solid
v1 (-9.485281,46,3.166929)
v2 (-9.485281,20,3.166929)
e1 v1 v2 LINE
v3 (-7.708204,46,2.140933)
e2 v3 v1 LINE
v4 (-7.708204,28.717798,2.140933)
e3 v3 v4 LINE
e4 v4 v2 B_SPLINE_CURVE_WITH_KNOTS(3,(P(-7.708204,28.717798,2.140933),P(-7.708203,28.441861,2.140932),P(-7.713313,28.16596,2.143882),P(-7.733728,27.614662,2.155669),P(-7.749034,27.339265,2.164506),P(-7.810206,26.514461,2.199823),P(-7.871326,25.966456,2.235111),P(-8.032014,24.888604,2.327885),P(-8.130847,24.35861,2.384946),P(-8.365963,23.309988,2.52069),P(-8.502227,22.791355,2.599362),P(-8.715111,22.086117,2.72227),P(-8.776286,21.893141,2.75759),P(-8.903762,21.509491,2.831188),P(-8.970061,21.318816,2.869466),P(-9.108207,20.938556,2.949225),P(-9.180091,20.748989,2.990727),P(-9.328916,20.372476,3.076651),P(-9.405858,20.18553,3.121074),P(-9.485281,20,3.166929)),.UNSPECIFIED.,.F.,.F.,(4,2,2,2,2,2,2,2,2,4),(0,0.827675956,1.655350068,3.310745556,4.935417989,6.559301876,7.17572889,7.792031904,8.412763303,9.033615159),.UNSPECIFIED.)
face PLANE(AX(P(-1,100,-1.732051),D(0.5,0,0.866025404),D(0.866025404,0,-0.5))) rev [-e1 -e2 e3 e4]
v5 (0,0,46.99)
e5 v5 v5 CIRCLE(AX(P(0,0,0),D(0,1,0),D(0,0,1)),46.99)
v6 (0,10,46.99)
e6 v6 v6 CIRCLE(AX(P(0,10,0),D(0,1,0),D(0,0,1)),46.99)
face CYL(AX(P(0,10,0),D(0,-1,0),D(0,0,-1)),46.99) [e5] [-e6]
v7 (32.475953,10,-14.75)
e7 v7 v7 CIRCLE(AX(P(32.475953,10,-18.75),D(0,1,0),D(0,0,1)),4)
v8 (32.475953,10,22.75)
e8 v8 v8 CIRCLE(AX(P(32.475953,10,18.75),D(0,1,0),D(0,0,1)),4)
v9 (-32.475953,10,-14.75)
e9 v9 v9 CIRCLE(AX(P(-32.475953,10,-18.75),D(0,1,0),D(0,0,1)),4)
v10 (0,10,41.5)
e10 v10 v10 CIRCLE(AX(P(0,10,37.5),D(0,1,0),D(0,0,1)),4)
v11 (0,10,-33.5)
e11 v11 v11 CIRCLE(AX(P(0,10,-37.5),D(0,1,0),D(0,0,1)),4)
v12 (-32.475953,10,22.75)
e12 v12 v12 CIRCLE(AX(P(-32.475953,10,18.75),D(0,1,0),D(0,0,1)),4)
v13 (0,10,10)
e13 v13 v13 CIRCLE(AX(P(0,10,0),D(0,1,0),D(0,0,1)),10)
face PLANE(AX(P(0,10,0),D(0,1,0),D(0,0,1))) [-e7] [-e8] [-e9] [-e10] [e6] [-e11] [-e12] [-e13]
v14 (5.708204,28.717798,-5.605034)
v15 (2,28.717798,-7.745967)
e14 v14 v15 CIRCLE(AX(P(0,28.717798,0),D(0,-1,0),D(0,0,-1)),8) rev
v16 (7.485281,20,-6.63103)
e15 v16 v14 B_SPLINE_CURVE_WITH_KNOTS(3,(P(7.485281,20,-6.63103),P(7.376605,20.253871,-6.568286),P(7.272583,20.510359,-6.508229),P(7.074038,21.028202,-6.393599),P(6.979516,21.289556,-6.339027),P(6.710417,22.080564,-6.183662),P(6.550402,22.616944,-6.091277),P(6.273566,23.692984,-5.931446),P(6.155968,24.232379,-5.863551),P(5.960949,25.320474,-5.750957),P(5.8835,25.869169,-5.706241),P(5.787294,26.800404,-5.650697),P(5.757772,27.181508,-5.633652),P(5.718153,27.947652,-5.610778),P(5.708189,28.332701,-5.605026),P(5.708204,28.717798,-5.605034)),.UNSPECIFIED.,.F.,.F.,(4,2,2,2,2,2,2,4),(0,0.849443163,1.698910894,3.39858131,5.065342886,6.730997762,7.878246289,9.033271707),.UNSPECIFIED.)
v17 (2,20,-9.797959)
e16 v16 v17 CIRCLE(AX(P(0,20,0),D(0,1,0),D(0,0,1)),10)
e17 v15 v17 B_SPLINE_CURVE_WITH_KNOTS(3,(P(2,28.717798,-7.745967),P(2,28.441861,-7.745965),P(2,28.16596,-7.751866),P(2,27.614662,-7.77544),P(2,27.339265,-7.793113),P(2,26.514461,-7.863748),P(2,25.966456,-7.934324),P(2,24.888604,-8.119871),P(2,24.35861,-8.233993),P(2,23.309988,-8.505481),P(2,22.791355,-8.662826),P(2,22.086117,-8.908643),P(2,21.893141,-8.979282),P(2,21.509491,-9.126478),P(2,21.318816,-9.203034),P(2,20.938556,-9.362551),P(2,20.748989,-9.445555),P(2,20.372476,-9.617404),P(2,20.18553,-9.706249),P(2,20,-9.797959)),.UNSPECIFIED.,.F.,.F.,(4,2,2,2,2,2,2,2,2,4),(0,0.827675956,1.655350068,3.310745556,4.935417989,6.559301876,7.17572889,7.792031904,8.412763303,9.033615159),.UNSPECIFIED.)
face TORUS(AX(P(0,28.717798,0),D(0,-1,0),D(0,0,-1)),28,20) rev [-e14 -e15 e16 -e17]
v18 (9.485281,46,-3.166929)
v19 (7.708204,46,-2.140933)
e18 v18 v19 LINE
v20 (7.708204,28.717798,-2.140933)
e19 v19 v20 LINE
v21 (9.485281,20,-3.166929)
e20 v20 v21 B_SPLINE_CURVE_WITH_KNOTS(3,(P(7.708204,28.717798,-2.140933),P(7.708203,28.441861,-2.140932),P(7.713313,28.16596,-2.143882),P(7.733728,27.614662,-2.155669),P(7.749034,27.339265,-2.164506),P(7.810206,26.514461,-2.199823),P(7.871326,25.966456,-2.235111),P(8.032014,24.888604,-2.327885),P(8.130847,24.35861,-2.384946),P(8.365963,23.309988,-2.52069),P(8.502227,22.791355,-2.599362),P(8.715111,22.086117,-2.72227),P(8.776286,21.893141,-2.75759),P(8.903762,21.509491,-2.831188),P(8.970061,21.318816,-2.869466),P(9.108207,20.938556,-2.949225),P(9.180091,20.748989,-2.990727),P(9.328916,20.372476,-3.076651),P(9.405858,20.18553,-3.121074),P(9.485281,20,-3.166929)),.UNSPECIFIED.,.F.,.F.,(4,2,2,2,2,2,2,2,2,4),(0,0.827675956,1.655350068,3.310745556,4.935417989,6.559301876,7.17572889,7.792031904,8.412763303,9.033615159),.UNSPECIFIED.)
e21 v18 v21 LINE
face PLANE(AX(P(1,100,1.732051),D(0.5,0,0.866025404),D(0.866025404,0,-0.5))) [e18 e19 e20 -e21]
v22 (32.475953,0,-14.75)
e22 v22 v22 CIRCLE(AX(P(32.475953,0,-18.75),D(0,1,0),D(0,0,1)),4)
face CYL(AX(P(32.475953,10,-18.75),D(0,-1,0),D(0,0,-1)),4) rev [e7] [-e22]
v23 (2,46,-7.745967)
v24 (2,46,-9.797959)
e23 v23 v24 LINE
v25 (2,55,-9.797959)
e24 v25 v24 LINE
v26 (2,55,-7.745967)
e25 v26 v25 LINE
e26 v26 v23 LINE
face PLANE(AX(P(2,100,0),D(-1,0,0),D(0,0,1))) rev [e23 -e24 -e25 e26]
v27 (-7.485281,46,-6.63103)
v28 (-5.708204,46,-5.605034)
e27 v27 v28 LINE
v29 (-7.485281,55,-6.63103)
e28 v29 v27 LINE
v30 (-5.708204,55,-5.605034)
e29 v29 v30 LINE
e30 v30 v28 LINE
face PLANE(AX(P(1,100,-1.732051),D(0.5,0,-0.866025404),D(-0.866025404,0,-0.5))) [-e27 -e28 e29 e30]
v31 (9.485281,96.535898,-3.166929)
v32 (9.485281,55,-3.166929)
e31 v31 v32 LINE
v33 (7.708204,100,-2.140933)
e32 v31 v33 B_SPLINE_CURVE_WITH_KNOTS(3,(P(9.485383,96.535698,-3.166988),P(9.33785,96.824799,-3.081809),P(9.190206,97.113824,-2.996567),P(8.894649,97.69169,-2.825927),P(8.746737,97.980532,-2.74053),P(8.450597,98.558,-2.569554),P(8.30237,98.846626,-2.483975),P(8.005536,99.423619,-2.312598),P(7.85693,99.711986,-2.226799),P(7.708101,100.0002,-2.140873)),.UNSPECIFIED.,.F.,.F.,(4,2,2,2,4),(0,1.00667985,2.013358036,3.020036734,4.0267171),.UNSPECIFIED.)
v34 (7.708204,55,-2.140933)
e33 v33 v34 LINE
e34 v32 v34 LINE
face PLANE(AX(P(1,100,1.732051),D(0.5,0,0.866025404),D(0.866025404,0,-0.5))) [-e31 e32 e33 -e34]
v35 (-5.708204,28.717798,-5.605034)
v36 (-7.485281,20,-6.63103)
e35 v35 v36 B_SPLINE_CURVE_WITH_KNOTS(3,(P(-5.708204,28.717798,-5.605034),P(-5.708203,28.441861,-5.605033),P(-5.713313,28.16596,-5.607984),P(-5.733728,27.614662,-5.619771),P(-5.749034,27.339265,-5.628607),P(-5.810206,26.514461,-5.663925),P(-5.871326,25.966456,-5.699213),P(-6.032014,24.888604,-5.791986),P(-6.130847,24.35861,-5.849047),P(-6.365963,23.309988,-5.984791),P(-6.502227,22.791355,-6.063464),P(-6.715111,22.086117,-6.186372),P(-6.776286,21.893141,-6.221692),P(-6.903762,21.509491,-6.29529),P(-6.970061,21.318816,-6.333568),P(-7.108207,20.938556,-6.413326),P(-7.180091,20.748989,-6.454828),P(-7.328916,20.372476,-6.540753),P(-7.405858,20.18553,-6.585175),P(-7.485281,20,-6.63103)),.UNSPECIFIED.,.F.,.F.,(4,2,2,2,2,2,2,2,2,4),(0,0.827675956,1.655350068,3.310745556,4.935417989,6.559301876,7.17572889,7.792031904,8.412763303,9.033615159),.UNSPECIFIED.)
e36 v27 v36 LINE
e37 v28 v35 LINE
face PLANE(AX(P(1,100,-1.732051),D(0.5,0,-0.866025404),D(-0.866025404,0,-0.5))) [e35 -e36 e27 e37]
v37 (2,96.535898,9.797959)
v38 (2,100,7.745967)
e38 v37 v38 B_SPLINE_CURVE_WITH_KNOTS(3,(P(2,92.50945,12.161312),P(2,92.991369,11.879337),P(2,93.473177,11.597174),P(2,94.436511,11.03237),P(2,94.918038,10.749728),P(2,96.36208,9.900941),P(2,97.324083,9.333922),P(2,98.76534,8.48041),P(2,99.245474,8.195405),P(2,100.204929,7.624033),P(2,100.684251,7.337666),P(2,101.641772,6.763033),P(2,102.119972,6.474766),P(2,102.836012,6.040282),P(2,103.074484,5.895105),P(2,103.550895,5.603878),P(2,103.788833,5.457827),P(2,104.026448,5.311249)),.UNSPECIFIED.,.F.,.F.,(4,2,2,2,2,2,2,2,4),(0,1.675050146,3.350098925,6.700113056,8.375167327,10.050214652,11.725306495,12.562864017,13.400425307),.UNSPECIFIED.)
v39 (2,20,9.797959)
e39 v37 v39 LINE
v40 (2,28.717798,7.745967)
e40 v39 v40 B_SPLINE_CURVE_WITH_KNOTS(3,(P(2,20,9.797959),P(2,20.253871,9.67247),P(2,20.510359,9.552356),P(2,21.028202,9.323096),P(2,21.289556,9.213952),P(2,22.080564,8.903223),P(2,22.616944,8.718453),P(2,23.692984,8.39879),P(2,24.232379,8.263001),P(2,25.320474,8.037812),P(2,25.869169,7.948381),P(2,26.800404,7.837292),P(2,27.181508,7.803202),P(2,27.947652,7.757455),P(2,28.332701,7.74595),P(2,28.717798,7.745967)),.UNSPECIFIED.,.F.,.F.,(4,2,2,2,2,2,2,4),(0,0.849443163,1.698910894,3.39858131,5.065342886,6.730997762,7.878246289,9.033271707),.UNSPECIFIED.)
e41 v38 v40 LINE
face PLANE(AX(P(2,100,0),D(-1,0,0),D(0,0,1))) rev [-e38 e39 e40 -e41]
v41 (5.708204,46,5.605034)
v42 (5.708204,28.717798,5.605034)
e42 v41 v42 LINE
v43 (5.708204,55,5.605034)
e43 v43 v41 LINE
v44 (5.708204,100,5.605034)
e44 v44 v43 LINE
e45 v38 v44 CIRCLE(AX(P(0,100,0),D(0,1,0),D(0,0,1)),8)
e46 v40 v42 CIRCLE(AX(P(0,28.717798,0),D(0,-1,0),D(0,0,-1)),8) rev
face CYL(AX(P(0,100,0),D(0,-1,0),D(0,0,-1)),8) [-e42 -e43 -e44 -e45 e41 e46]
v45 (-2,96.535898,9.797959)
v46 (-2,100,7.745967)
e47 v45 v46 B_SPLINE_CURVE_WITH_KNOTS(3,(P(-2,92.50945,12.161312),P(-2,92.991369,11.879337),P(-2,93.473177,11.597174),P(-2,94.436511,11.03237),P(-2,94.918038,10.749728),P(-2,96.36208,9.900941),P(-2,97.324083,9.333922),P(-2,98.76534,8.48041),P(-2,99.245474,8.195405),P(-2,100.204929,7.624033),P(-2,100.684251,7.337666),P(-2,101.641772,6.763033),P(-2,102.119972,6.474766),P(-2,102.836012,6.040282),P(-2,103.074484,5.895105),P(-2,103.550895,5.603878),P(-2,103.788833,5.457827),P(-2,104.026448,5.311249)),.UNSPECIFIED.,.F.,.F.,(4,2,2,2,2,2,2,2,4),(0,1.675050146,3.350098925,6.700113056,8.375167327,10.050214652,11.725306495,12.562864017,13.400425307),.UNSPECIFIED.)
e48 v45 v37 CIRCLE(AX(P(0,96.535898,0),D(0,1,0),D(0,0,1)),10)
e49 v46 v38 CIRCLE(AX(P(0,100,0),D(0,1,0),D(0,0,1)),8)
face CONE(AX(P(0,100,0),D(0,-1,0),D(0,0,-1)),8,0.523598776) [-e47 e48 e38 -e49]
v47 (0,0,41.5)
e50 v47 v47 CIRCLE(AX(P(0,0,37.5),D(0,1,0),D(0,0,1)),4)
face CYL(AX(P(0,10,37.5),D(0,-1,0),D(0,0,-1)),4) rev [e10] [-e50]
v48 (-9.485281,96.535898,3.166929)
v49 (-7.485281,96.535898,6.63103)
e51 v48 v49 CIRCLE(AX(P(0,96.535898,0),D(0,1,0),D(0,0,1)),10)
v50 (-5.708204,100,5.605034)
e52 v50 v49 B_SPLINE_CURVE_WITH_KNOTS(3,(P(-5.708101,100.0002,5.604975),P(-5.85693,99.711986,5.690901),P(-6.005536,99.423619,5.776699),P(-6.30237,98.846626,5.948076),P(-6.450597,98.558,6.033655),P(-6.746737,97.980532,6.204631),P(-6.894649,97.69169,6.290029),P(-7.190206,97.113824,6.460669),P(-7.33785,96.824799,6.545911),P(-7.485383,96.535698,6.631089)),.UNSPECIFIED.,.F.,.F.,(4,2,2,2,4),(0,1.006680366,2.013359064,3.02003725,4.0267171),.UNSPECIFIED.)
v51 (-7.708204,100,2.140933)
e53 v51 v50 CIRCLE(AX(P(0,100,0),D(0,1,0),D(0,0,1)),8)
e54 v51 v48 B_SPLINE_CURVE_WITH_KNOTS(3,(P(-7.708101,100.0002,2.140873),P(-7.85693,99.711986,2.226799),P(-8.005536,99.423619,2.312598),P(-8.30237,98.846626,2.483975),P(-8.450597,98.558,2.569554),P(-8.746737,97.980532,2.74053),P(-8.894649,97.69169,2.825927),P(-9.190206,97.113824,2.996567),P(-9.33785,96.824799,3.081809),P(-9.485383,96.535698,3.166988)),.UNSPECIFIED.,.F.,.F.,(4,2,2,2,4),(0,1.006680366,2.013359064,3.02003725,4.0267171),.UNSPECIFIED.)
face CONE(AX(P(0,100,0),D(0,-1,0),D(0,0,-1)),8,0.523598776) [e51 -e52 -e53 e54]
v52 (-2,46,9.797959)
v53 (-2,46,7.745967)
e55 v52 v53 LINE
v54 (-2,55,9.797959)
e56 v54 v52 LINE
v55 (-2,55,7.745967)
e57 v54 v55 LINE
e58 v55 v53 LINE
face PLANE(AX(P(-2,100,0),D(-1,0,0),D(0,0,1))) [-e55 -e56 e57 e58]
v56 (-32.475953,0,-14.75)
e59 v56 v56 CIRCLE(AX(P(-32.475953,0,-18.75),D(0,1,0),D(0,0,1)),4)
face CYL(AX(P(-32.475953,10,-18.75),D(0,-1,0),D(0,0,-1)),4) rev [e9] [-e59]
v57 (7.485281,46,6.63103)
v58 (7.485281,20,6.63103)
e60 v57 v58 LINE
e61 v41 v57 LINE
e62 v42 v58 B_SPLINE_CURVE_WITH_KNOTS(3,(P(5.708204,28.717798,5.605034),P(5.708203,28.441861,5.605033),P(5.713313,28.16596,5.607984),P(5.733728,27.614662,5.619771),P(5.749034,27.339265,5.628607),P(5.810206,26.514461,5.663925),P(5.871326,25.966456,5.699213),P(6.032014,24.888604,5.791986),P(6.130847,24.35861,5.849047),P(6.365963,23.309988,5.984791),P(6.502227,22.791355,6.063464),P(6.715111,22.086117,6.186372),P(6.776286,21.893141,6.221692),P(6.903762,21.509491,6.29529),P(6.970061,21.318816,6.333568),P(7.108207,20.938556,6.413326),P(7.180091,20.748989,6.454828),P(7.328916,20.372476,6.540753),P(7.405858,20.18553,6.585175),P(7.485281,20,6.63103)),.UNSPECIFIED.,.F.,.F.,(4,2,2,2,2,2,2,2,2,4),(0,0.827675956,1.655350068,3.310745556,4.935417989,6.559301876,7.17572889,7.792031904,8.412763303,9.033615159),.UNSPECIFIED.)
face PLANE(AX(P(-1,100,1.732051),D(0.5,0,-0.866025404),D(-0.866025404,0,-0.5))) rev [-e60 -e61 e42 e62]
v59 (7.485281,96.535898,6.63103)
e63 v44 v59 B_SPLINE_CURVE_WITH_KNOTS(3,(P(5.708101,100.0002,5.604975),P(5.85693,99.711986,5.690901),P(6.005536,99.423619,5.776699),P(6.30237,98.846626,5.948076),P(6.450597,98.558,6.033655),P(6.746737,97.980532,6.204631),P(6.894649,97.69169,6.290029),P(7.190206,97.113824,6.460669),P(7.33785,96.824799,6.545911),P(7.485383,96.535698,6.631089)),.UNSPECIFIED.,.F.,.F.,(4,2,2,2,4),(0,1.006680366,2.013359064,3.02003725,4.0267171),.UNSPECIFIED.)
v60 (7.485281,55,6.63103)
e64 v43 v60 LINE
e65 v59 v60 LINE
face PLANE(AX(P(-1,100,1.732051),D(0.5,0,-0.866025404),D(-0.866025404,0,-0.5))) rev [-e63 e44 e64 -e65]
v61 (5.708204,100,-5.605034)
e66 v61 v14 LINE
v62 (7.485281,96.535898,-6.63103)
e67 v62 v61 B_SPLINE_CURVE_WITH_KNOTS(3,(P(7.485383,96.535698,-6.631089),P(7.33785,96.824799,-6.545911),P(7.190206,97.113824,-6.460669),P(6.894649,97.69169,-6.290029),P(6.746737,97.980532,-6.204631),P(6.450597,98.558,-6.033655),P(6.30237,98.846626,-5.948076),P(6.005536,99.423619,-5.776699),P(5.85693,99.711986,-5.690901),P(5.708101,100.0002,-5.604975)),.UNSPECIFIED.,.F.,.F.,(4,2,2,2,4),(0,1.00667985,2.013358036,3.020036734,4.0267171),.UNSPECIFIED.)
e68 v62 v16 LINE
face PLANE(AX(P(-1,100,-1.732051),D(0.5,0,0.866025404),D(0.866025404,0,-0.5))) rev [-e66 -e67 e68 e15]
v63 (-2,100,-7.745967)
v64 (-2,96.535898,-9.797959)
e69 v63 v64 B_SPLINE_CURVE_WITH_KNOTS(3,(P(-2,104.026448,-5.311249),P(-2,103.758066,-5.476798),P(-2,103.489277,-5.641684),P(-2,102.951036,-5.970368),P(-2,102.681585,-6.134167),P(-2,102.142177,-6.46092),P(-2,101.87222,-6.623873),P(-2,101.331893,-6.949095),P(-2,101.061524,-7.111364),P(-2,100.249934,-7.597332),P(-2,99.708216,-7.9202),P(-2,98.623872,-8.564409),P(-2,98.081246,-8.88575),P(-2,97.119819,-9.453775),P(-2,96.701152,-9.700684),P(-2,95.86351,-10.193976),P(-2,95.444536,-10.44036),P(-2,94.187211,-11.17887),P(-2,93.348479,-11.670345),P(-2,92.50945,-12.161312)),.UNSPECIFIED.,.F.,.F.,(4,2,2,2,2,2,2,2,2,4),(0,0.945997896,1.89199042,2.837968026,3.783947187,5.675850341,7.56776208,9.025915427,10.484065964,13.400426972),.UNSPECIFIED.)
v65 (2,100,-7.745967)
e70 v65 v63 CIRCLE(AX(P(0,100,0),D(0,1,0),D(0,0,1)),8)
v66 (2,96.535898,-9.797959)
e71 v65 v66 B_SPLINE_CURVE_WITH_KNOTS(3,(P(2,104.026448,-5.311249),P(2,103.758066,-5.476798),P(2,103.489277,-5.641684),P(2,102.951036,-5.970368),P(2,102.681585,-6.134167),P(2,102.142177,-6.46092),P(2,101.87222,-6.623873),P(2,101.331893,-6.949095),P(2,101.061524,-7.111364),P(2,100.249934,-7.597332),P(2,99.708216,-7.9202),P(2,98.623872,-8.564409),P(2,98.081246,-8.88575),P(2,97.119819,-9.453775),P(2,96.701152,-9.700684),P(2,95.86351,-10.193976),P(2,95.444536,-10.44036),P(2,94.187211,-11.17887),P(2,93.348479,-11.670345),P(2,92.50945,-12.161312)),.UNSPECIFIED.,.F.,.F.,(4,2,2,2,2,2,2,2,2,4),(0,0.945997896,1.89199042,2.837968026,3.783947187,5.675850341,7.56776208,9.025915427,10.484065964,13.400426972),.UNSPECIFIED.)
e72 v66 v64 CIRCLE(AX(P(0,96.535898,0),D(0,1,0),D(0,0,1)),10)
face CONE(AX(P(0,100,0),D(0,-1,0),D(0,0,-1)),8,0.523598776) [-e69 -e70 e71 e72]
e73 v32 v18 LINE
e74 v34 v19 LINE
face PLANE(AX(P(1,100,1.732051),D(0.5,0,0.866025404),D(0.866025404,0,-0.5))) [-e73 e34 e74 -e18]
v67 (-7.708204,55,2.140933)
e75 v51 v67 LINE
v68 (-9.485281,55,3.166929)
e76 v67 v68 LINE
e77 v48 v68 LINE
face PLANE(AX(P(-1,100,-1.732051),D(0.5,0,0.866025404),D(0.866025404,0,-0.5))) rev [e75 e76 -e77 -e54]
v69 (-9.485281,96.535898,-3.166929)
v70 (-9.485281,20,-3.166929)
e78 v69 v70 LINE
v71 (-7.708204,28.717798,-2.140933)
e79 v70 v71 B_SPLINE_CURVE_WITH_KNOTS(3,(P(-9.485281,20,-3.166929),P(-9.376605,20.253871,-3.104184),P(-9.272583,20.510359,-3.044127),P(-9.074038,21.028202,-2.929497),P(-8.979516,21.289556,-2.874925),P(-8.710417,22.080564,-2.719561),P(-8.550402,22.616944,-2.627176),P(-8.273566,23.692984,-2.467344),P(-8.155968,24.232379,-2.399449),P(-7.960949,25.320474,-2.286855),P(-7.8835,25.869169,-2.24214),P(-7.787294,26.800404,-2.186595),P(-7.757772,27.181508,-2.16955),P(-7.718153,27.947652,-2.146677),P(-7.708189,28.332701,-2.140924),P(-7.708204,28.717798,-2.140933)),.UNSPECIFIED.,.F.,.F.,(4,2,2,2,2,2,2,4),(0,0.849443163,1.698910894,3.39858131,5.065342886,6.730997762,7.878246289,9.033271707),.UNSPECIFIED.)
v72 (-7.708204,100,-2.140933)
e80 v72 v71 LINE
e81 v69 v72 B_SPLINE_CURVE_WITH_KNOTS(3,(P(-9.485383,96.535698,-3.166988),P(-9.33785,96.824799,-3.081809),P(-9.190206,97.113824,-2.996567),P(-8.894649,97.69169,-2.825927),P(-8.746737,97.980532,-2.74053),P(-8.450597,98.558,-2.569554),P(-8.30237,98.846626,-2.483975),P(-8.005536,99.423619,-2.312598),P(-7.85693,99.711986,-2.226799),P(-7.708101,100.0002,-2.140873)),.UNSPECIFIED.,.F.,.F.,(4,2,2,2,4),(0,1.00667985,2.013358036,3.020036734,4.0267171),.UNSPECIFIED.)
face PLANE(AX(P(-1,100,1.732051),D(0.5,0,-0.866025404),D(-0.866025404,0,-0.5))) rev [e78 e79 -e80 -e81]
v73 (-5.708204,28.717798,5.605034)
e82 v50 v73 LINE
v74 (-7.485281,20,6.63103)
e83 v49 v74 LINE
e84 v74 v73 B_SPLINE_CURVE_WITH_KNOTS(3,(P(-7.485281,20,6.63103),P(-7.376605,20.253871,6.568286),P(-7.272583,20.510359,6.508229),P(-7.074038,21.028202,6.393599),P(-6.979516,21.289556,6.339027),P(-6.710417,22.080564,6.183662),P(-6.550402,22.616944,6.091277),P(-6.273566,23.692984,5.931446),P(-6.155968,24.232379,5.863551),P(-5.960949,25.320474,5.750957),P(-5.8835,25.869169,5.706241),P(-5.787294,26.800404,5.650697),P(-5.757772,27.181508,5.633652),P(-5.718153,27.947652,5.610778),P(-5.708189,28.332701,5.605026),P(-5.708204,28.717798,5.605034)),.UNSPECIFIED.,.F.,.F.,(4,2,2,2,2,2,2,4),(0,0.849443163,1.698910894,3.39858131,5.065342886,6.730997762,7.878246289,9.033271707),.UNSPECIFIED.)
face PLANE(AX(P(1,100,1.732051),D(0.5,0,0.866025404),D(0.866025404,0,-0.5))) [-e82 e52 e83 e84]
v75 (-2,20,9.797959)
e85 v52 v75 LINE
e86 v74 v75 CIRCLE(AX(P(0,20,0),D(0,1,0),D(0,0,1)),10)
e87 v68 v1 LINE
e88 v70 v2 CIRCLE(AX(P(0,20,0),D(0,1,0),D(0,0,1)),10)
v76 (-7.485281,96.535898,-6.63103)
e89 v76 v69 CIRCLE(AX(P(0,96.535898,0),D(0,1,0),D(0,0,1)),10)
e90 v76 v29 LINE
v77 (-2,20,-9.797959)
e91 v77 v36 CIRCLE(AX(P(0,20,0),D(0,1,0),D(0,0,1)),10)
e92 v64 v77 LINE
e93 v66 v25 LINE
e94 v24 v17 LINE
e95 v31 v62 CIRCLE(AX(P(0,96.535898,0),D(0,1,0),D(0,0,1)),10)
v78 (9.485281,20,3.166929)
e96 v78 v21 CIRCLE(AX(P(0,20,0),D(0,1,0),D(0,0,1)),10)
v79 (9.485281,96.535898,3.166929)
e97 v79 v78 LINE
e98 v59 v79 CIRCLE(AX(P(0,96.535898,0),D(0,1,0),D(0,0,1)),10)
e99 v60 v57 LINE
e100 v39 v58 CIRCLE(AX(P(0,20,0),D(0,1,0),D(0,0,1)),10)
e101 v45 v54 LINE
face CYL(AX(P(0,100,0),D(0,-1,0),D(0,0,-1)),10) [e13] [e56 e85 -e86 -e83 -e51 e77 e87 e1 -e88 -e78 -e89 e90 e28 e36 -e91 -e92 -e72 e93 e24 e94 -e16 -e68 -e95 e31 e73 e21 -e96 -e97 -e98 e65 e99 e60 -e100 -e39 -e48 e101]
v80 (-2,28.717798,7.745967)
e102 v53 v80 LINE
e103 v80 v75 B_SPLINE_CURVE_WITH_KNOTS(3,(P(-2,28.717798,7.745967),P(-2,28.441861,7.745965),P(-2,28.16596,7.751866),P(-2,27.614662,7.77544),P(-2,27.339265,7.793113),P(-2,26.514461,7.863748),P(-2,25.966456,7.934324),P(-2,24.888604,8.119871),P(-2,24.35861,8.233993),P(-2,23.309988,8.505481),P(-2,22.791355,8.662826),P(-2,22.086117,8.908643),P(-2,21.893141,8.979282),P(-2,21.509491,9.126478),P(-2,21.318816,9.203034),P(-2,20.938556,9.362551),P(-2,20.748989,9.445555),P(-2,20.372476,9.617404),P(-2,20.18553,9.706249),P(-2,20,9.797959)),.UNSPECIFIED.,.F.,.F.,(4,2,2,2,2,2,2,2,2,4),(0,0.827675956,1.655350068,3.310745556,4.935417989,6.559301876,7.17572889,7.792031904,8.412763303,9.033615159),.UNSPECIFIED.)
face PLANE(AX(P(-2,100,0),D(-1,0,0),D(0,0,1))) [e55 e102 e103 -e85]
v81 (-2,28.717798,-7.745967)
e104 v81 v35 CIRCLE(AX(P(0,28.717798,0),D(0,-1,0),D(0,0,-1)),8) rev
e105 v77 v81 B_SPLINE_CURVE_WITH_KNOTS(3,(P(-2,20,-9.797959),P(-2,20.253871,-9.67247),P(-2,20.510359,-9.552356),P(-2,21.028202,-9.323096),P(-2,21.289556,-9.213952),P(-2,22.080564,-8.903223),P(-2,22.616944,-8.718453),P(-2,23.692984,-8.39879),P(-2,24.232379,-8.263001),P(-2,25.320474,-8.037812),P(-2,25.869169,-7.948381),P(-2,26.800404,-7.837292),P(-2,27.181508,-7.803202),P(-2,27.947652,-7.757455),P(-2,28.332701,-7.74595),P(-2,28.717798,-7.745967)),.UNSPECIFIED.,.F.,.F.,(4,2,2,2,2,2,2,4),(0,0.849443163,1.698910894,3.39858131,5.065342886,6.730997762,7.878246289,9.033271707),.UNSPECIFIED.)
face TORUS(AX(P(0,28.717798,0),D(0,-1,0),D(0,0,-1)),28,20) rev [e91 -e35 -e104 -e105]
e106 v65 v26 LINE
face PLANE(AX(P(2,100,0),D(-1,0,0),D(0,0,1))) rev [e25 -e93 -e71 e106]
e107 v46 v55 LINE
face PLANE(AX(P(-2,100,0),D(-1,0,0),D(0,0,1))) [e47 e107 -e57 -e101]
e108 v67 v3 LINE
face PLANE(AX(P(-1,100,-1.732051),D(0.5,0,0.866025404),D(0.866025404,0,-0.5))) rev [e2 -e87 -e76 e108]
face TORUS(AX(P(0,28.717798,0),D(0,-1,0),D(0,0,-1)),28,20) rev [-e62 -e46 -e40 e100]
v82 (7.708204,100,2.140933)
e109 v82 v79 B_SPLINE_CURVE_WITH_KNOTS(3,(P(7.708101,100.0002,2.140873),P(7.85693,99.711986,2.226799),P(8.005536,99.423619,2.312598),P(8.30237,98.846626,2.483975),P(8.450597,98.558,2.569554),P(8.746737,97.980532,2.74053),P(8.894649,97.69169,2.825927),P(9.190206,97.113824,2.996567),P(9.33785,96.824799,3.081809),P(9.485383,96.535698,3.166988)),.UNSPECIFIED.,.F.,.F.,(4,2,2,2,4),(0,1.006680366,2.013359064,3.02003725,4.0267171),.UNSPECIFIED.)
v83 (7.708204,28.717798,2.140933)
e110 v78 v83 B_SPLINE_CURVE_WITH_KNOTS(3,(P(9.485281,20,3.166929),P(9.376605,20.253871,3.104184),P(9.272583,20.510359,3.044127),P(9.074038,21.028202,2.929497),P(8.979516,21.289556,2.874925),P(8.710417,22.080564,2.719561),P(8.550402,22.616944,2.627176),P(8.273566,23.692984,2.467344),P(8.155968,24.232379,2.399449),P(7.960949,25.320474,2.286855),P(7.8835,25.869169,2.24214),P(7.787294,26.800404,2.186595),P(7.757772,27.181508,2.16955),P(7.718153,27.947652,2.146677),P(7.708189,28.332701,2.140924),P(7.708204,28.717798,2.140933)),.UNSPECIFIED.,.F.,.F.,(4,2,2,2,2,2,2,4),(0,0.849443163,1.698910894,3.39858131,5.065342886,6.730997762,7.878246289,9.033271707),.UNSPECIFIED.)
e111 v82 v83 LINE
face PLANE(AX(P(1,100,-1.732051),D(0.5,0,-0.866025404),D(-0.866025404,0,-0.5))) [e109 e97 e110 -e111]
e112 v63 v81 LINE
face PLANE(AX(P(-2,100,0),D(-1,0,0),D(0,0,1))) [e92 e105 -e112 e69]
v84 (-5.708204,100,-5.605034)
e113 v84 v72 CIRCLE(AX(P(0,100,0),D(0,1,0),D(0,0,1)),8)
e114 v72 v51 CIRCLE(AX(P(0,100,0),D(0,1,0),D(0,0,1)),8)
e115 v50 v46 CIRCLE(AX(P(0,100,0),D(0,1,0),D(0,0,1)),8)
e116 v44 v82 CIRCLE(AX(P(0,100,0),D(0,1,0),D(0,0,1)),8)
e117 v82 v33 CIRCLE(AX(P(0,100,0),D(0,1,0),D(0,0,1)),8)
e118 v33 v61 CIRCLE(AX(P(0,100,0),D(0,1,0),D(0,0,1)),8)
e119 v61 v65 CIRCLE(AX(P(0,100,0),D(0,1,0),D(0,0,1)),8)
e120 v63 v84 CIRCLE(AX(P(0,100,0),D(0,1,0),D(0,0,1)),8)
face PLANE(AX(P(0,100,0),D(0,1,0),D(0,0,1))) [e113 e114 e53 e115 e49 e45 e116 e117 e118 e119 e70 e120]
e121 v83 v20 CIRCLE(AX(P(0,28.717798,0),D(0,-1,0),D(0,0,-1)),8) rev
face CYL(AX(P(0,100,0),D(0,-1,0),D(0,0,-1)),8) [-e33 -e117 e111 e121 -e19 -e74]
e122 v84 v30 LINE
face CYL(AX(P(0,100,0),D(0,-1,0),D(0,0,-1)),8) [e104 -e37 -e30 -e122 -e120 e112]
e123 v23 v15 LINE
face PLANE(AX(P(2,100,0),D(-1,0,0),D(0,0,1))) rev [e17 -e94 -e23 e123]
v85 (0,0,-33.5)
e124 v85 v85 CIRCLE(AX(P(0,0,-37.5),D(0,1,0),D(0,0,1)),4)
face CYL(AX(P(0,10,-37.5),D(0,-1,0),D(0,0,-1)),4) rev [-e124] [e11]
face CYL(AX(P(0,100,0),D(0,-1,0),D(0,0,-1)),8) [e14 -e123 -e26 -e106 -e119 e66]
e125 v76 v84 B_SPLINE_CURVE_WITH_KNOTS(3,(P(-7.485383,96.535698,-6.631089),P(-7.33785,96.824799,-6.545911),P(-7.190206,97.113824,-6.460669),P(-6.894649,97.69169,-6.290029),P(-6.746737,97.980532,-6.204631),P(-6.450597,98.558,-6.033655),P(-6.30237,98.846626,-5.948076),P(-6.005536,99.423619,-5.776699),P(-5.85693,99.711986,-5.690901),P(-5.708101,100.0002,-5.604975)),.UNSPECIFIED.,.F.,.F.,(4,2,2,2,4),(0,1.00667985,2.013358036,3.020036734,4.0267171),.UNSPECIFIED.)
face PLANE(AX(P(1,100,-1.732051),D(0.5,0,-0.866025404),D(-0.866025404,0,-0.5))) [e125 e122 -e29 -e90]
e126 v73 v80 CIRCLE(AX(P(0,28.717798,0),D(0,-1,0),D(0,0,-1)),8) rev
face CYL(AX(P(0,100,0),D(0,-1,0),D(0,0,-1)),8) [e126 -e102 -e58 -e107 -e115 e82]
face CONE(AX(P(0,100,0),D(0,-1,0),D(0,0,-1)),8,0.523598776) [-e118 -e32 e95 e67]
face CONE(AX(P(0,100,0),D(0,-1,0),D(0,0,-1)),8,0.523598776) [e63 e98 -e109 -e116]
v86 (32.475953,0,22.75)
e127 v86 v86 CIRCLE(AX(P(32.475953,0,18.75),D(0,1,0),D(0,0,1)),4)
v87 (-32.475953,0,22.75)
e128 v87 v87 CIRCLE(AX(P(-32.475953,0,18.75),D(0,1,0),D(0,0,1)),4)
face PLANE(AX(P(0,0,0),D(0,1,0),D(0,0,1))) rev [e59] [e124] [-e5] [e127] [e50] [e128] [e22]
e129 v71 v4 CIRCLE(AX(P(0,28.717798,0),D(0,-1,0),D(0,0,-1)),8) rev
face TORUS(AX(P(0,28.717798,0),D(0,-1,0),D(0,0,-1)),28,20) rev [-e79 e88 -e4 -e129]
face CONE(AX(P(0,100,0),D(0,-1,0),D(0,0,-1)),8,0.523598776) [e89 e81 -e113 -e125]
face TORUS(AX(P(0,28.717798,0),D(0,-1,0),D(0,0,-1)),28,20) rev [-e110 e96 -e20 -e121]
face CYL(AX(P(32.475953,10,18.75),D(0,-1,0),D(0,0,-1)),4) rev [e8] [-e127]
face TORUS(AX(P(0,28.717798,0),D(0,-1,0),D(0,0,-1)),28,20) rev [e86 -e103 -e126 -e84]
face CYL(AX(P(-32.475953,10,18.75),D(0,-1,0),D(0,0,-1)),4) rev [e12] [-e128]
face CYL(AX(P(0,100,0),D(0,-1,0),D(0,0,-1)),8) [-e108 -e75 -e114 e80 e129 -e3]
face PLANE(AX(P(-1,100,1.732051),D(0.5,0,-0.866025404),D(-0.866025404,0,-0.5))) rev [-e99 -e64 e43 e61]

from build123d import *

# Parameters (mm, degrees)
SKETCH1_R           = 46.99
SKETCH1_R_2         = 8.509
SKETCH1_R_3         = 4
BOSS_EXTRUDE1_DEPTH = 10
BOSS_EXTRUDE2_DEPTH = 90
SKETCH4_R           = 10
BOSS_EXTRUDE3_DEPTH = 10
FILLET2_R           = 20


with BuildPart() as part:
    # Sketch1 → Boss-Extrude1 (new body)
    # profile 1 of 2: a face of its own
    with BuildSketch(Plane(origin=(0, 0, 0), x_dir=(1, 0, 0), z_dir=(0, 1, 0))):
        with Locations(Location((0, 0, 0), (0, 0, 270))):
            Circle(SKETCH1_R)
        Circle(SKETCH1_R_2, mode=Mode.SUBTRACT)
        with Locations(Location((-32.475952642, 18.75, 0), (0, 0, 270))):
            Circle(SKETCH1_R_3, mode=Mode.SUBTRACT)
        with Locations(Location((-32.475952642, -18.75, 0), (0, 0, 270))):
            Circle(SKETCH1_R_3, mode=Mode.SUBTRACT)
        with Locations(Location((0, -37.5, 0), (0, 0, 270))):
            Circle(SKETCH1_R_3, mode=Mode.SUBTRACT)
        with Locations(Location((32.475952642, -18.75, 0), (0, 0, 270))):
            Circle(SKETCH1_R_3, mode=Mode.SUBTRACT)
        with Locations(Location((32.475952642, 18.75, 0), (0, 0, 270))):
            Circle(SKETCH1_R_3, mode=Mode.SUBTRACT)
        with Locations(Location((0, 37.5, 0), (0, 0, 270))):
            Circle(SKETCH1_R_3, mode=Mode.SUBTRACT)
    # profile 2 of 2: a face of its own
    with BuildSketch(Plane(origin=(0, 0, 0), x_dir=(1, 0, 0), z_dir=(0, 1, 0))):
        Circle(SKETCH1_R_2)
    extrude(amount=BOSS_EXTRUDE1_DEPTH)

    # Sketch2 → Boss-Extrude2 (add)
    with BuildSketch(Plane(origin=(0, 10, 0), x_dir=(1, 0, 0), z_dir=(0, 1, 0))):
        with BuildLine():
            Line((-5.708203932, 5.605034154), (-7.485281374, 6.631030293))
            ThreePointArc((-7.485281374, 6.631030293), (-8.660254038, 5), (-9.485281374, 3.166928678))
            Line((-9.485281374, 3.166928678), (-7.708203932, 2.140932539))
            ThreePointArc((-7.708203932, 2.140932539), (-8, 0), (-7.708203932, -2.140932539))
            Line((-7.708203932, -2.140932539), (-9.485281374, -3.166928678))
            ThreePointArc((-9.485281374, -3.166928678), (-8.660254038, -5), (-7.485281374, -6.631030293))
            Line((-7.485281374, -6.631030293), (-5.708203932, -5.605034154))
            ThreePointArc((-5.708203932, -5.605034154), (-4, -6.92820323), (-2, -7.745966692))
            Line((-2, -7.745966692), (-2, -9.797958971))
            ThreePointArc((-2, -9.797958971), (0, -10), (2, -9.797958971))
            Line((2, -9.797958971), (2, -7.745966692))
            ThreePointArc((2, -7.745966692), (4, -6.92820323), (5.708203932, -5.605034154))
            Line((5.708203932, -5.605034154), (7.485281374, -6.631030293))
            ThreePointArc((7.485281374, -6.631030293), (8.660254038, -5), (9.485281374, -3.166928678))
            Line((9.485281374, -3.166928678), (7.708203932, -2.140932539))
            ThreePointArc((7.708203932, -2.140932539), (8, 0), (7.708203932, 2.140932539))
            Line((7.708203932, 2.140932539), (9.485281374, 3.166928678))
            ThreePointArc((9.485281374, 3.166928678), (8.660254038, 5), (7.485281374, 6.631030293))
            Line((7.485281374, 6.631030293), (5.708203932, 5.605034154))
            ThreePointArc((5.708203932, 5.605034154), (4, 6.92820323), (2, 7.745966692))
            Line((2, 7.745966692), (2, 9.797958971))
            ThreePointArc((2, 9.797958971), (0, 10), (-2, 9.797958971))
            Line((-2, 9.797958971), (-2, 7.745966692))
            ThreePointArc((-2, 7.745966692), (-4, 6.92820323), (-5.708203932, 5.605034154))
        make_face()
    extrude(amount=BOSS_EXTRUDE2_DEPTH)

    # Sketch4 → Boss-Extrude3 (add)
    with BuildSketch(Plane(origin=(0, 10, 0), x_dir=(1, 0, 0), z_dir=(0, 1, 0))):
        with Locations(Location((0, 0, 0), (0, 0, 101.536959033))):
            Circle(SKETCH4_R)
    extrude(amount=BOSS_EXTRUDE3_DEPTH)

    # Fillet2
    # the kernel refuses this fillet: 20 mm, written as the material it adds along each edge
    with BuildSketch(Plane(origin=(0, 20, 0), x_dir=(0.9893271243483546, 0, 0.1457114993012412), z_dir=(0.1457114993012412, 0, -0.9893271243483546))) as fillet2_piece_1:
        with BuildLine():
            CenterArc((28, -8.717797887), FILLET2_R, 154.158067237, 25.841932763)
            Line((8, -8.717797887), (8, 0))
            Line((8, 0), (10, 0))
        make_face()
    revolve(axis=Axis((0, 20, 0), (0, -1, 0)), revolution_arc=343.243034599)
    with BuildSketch(Plane(origin=(0, 20, 0), x_dir=(0.6208534221926202, 0, -0.7839266726880214), z_dir=(-0.7839266726880214, 0, -0.6208534221926202))) as fillet2_piece_2:
        with BuildLine():
            CenterArc((28, -8.717797887), FILLET2_R, 154.158067237, 25.841932763)
            Line((8, -8.717797887), (8, 0))
            Line((8, 0), (10, 0))
        make_face()
    revolve(axis=Axis((0, 20, 0), (0, -1, 0)), revolution_arc=343.243034599)
    with BuildSketch(Plane(origin=(0, 20, 0), x_dir=(-0.36847370215574865, 0, -0.9296381719893158), z_dir=(-0.9296381719893158, 0, 0.36847370215574865))) as fillet2_piece_3:
        with BuildLine():
            CenterArc((28, -8.717797887), FILLET2_R, 154.158067237, 25.841932763)
            Line((10, 0), (8, 0))
            Line((8, 0), (8, -8.717797887))
        make_face()
    revolve(axis=Axis((0, 20, 0), (0, -1, 0)), revolution_arc=343.243034599)
    with BuildSketch(Plane(origin=(0, 20, 0), x_dir=(-0.9893271243483555, 0, -0.14571149930123434), z_dir=(-0.14571149930123434, 0, 0.9893271243483555))) as fillet2_piece_4:
        with BuildLine():
            CenterArc((28, -8.717797887), FILLET2_R, 154.158067237, 25.841932763)
            Line((10, 0), (8, 0))
            Line((8, 0), (8, -8.717797887))
        make_face()
    revolve(axis=Axis((0, 20, 0), (0, -1, 0)), revolution_arc=343.243034599)
    with BuildSketch(Plane(origin=(0, 20, 0), x_dir=(-0.6208534221925923, 0, 0.7839266726880435), z_dir=(0.7839266726880435, 0, 0.6208534221925923))) as fillet2_piece_5:
        with BuildLine():
            CenterArc((28, -8.717797887), FILLET2_R, 154.158067237, 25.841932763)
            Line((8, -8.717797887), (8, 0))
            Line((8, 0), (10, 0))
        make_face()
    revolve(axis=Axis((0, 20, 0), (0, -1, 0)), revolution_arc=343.243034599)
    with BuildSketch(Plane(origin=(0, 20, 0), x_dir=(0.3684737021557518, 0, 0.9296381719893145), z_dir=(0.9296381719893145, 0, -0.3684737021557518))) as fillet2_piece_6:
        with BuildLine():
            CenterArc((28, -8.717797887), FILLET2_R, 154.158067237, 25.841932763)
            Line((8, -8.717797887), (8, 0))
            Line((8, 0), (10, 0))
        make_face()
    revolve(axis=Axis((0, 20, 0), (0, -1, 0)), revolution_arc=343.243034599)

    # Sketch7 → Cut-Revolve1 (revolve, cut)
    with BuildSketch(Plane(origin=(0, 0, 0), x_dir=(0, 0, -1), z_dir=(1, 0, 0)), mode=Mode.PRIVATE) as cut_revolve1_sk:
        Polygon((10, 100), (10, 96.535898385), (8, 100), align=None)
    revolve(cut_revolve1_sk.sketch.rotate(Axis((0, 136.433969782, 0), (0, -1, 0)), 348.463040967), axis=Axis((0, 136.433969782, 0), (0, -1, 0)), mode=Mode.SUBTRACT)


solid = part.part
